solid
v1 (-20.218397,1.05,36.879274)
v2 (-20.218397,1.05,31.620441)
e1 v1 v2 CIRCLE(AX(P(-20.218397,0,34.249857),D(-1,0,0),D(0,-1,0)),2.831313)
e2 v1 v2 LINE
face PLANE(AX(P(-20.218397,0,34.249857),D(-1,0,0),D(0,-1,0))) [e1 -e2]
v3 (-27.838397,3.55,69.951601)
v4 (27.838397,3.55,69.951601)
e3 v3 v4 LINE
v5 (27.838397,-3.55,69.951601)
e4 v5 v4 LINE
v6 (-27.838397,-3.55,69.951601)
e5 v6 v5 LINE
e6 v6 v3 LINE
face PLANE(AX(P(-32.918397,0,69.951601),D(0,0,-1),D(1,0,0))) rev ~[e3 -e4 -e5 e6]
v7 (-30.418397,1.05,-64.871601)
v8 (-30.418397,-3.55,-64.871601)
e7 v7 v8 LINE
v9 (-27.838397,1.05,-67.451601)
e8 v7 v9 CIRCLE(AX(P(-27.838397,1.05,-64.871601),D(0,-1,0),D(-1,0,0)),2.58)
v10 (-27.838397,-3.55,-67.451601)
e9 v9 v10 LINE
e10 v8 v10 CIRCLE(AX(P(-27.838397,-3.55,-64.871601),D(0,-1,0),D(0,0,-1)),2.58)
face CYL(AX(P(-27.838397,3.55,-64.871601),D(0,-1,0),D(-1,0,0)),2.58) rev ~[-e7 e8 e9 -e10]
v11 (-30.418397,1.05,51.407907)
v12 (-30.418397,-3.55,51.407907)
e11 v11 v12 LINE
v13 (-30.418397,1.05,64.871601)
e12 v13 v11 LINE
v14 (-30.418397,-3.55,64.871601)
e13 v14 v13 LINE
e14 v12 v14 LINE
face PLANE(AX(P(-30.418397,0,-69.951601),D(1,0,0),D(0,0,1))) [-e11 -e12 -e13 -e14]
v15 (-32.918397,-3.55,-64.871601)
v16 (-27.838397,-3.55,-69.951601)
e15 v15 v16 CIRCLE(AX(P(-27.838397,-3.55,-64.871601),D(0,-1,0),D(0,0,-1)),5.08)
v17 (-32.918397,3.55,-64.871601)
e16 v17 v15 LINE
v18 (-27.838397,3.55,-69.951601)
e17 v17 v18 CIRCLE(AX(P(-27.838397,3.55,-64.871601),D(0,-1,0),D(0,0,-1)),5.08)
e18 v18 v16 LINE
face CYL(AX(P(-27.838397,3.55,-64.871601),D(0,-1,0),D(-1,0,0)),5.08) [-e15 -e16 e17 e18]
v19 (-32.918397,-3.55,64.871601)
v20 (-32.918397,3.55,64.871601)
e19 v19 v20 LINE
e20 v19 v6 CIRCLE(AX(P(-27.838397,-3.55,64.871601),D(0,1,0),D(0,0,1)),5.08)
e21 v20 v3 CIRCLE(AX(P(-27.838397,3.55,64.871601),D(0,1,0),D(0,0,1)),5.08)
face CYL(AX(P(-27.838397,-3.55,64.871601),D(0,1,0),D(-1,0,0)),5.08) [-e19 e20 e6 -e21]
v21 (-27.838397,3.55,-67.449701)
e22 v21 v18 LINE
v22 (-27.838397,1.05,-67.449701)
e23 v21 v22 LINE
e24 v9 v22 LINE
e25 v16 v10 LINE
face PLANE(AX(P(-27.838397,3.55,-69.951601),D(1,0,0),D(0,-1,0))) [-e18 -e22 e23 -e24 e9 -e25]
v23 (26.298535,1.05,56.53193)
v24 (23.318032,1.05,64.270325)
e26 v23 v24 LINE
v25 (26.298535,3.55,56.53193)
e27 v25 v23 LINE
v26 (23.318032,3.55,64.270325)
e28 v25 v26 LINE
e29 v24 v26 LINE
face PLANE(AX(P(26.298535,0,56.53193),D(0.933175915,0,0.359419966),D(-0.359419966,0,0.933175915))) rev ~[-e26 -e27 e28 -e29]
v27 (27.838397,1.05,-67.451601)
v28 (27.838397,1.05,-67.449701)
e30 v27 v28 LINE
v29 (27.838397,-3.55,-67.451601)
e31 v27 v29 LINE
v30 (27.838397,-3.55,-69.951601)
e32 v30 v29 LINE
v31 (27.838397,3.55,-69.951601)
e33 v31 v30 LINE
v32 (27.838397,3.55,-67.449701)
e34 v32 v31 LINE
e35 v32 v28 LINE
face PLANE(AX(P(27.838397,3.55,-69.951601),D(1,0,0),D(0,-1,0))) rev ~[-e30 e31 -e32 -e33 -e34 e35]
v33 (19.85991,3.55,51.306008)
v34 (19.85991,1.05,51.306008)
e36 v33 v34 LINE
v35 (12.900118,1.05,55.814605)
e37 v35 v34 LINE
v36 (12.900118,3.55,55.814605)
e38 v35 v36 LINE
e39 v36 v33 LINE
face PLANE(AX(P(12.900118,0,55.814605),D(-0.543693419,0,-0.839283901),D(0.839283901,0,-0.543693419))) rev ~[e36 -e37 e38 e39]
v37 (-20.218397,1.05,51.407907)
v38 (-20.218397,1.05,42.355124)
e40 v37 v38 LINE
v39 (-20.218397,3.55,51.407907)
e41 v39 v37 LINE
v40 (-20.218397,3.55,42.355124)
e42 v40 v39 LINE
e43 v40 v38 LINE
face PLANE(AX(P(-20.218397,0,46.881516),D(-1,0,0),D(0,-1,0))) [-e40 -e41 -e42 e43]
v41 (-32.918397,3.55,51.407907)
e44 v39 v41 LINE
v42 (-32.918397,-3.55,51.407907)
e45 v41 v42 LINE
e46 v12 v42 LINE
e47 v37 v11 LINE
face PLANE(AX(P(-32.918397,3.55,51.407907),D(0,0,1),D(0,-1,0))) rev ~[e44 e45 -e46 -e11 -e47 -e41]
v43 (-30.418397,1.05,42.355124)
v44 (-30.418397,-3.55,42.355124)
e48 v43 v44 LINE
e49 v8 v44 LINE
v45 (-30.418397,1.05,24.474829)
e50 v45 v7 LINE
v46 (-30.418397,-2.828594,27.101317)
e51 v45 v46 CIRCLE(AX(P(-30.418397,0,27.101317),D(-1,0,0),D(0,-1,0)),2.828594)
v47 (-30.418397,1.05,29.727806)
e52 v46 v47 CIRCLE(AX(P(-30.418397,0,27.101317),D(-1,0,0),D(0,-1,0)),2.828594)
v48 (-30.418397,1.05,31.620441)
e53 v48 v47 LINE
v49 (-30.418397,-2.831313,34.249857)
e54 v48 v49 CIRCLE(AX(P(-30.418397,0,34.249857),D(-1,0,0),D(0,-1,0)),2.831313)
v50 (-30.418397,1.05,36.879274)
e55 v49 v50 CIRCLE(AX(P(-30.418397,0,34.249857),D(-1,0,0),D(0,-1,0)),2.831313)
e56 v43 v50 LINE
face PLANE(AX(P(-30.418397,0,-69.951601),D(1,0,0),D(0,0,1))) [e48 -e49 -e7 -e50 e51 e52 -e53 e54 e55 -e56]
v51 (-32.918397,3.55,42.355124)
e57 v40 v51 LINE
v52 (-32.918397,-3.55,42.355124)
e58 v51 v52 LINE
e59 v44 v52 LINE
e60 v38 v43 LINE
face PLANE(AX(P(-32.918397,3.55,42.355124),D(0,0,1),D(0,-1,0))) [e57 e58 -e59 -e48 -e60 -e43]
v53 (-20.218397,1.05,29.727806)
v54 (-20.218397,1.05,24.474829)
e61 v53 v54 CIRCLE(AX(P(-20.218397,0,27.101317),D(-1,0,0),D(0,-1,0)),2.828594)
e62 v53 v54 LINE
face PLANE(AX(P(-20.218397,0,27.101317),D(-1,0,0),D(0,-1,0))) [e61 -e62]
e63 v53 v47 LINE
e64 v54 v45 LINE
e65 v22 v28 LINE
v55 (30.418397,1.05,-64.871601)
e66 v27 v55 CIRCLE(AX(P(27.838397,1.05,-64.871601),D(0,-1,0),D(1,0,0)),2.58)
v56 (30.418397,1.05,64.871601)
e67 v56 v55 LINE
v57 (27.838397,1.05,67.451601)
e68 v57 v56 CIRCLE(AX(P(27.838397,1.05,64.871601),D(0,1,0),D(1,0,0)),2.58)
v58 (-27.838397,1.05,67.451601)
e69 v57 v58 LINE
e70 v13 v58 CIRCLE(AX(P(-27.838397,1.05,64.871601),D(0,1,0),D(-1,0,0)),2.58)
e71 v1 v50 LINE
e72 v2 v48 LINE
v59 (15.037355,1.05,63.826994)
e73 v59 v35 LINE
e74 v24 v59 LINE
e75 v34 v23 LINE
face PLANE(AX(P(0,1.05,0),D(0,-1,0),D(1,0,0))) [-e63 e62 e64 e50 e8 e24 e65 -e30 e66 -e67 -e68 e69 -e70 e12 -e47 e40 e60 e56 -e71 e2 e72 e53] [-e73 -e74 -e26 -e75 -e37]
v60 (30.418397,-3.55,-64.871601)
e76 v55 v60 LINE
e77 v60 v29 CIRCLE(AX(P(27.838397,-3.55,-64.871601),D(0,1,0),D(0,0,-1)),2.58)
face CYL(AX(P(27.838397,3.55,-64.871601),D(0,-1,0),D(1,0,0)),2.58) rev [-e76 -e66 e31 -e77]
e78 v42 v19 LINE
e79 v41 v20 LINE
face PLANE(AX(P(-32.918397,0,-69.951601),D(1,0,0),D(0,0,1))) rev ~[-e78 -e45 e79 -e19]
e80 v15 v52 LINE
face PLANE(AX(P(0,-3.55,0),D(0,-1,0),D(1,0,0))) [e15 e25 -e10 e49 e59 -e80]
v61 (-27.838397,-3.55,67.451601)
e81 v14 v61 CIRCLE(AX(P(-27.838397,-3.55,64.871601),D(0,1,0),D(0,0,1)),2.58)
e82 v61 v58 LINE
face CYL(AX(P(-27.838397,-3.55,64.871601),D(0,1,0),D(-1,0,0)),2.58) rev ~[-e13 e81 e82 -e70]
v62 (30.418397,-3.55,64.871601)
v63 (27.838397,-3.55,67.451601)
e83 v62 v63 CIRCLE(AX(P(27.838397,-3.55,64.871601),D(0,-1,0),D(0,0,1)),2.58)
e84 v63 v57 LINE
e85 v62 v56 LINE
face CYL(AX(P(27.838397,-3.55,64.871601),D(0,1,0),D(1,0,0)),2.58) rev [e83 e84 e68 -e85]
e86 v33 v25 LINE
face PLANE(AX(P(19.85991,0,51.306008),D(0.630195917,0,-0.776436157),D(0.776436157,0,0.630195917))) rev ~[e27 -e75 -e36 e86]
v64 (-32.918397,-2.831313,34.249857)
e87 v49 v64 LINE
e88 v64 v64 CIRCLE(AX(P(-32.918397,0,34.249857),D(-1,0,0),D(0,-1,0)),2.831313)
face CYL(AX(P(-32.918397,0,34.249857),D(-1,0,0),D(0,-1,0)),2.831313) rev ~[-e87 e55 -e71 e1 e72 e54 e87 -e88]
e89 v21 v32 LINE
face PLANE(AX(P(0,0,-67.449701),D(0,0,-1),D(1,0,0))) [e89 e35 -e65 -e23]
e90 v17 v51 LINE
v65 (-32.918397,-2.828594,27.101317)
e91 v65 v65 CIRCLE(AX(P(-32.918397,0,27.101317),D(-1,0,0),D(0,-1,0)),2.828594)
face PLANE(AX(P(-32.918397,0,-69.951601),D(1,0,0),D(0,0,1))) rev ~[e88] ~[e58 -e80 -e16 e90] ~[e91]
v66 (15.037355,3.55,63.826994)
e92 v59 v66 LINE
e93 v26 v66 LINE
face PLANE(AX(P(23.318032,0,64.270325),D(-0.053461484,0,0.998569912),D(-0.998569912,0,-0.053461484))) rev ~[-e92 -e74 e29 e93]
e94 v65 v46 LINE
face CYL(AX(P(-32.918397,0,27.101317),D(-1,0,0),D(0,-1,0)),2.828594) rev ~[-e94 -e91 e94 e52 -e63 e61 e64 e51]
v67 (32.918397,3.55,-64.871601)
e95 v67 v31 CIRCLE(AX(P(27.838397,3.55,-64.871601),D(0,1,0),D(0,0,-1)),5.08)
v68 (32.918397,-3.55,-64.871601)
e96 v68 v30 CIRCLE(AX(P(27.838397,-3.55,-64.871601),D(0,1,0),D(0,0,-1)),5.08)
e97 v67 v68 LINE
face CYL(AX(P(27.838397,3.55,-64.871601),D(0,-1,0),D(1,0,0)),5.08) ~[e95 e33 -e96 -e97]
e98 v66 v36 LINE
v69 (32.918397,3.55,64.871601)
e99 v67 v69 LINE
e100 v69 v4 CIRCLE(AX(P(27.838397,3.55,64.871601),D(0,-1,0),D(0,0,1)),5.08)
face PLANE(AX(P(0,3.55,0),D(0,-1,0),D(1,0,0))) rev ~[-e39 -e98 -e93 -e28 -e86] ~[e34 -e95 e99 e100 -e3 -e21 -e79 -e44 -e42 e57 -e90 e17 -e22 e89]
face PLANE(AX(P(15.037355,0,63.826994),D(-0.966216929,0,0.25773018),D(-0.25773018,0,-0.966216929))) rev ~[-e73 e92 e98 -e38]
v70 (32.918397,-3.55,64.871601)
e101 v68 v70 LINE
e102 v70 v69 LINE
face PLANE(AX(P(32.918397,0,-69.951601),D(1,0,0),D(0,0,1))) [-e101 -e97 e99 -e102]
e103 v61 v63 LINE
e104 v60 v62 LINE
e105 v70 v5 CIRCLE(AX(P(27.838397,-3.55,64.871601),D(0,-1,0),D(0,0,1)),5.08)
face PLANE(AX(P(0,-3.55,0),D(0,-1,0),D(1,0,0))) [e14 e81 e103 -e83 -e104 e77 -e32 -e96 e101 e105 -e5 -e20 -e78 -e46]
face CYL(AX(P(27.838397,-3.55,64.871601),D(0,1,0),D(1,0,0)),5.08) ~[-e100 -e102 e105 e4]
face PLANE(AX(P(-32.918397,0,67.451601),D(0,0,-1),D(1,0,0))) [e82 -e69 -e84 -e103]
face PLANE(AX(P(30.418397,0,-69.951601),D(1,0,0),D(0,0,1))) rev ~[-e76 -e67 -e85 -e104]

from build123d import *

# Parameters (mm, degrees)
F0_W      = 65.8367946744
F0_H      = 139.9032026529
F1_DEPTH  = 3.55
F2_R      = 5.08
F3_T      = -2.5
F5_DEPTH  = 12.7
F6_W      = 55.6767946744
F6_H      = 7.1
F7_DEPTH  = 2.5019
F8_W      = 7.1
F8_H      = 9.0527832508
F8_R      = 2.8313125725
F8_R_2    = 2.8285937047
F9_DEPTH  = 12.7
F10_DEPTH = 0.5


# Not quite as in the source:
# - a feature names something its author has since deleted; it is built from what else it names


with BuildPart() as f1:
    # F0 (on Front) → F1 (new body, symmetric)
    with BuildSketch(Plane.XZ):
        Rectangle(F0_W, F0_H)
    extrude(amount=F1_DEPTH, both=True)

    # F2
    f2_edges = [f1.edges().sort_by_distance(p)[0] for p in [
        (-32.918397, 0, 69.951601),
        (32.918397, 0, 69.951601),
        (-32.918397, 0, -69.951601),
        (32.918397, 0, -69.951601),
    ]]
    fillet(f2_edges, radius=F2_R)

    # F3
    f3_openings = [f1.faces().sort_by_distance(p)[0] for p in [
        (0, -3.55, 0),
    ]]
    offset(amount=F3_T, openings=f3_openings)

    # F4 (on Front) → F5 (cut, symmetric)
    with BuildSketch(Plane.XZ):
        Polygon((12.9001184621, 55.8146053817), (19.8599101564, 51.3060083088), (26.2985346927, 56.5319304354), (23.3180318028, 64.2703250051), (15.0373551768, 63.8269937409), align=None)
    extrude(amount=F5_DEPTH, both=True, mode=Mode.SUBTRACT)

    # F6 (on face) → F7 (cut, symmetric)
    with BuildSketch(Plane(origin=(0, 0, -69.9516013265), x_dir=(1, 0, 0), z_dir=(0, 0, -1))):
        Rectangle(F6_W, F6_H)
    extrude(amount=F7_DEPTH, both=True, mode=Mode.SUBTRACT)

    # F8 (on face) → F9 (cut, symmetric)
    with BuildSketch(Plane(origin=(-32.9183973372, 0, 0), x_dir=(0, -1, 0), z_dir=(-1, 0, 0))):
        with Locations((0, 46.8815155327)):
            Rectangle(F8_W, F8_H)
        with Locations((0, 34.2498570681)):
            Circle(F8_R)
        with Locations((0, 27.1013174206)):
            Circle(F8_R_2)
    extrude(amount=F9_DEPTH, both=True, mode=Mode.SUBTRACT)

    # F8 (on face) → F10 (cut, symmetric)
    with BuildSketch(Plane(origin=(-32.9183973372, 0, 0), x_dir=(0, -1, 0), z_dir=(-1, 0, 0))):
        with Locations((0, 46.8815155327)):
            Rectangle(F8_W, F8_H)
        with Locations((0, 34.2498570681)):
            Circle(F8_R)
        with Locations((0, 27.1013174206)):
            Circle(F8_R_2)
    extrude(amount=F10_DEPTH, both=True, mode=Mode.SUBTRACT)


solid = f1.part
